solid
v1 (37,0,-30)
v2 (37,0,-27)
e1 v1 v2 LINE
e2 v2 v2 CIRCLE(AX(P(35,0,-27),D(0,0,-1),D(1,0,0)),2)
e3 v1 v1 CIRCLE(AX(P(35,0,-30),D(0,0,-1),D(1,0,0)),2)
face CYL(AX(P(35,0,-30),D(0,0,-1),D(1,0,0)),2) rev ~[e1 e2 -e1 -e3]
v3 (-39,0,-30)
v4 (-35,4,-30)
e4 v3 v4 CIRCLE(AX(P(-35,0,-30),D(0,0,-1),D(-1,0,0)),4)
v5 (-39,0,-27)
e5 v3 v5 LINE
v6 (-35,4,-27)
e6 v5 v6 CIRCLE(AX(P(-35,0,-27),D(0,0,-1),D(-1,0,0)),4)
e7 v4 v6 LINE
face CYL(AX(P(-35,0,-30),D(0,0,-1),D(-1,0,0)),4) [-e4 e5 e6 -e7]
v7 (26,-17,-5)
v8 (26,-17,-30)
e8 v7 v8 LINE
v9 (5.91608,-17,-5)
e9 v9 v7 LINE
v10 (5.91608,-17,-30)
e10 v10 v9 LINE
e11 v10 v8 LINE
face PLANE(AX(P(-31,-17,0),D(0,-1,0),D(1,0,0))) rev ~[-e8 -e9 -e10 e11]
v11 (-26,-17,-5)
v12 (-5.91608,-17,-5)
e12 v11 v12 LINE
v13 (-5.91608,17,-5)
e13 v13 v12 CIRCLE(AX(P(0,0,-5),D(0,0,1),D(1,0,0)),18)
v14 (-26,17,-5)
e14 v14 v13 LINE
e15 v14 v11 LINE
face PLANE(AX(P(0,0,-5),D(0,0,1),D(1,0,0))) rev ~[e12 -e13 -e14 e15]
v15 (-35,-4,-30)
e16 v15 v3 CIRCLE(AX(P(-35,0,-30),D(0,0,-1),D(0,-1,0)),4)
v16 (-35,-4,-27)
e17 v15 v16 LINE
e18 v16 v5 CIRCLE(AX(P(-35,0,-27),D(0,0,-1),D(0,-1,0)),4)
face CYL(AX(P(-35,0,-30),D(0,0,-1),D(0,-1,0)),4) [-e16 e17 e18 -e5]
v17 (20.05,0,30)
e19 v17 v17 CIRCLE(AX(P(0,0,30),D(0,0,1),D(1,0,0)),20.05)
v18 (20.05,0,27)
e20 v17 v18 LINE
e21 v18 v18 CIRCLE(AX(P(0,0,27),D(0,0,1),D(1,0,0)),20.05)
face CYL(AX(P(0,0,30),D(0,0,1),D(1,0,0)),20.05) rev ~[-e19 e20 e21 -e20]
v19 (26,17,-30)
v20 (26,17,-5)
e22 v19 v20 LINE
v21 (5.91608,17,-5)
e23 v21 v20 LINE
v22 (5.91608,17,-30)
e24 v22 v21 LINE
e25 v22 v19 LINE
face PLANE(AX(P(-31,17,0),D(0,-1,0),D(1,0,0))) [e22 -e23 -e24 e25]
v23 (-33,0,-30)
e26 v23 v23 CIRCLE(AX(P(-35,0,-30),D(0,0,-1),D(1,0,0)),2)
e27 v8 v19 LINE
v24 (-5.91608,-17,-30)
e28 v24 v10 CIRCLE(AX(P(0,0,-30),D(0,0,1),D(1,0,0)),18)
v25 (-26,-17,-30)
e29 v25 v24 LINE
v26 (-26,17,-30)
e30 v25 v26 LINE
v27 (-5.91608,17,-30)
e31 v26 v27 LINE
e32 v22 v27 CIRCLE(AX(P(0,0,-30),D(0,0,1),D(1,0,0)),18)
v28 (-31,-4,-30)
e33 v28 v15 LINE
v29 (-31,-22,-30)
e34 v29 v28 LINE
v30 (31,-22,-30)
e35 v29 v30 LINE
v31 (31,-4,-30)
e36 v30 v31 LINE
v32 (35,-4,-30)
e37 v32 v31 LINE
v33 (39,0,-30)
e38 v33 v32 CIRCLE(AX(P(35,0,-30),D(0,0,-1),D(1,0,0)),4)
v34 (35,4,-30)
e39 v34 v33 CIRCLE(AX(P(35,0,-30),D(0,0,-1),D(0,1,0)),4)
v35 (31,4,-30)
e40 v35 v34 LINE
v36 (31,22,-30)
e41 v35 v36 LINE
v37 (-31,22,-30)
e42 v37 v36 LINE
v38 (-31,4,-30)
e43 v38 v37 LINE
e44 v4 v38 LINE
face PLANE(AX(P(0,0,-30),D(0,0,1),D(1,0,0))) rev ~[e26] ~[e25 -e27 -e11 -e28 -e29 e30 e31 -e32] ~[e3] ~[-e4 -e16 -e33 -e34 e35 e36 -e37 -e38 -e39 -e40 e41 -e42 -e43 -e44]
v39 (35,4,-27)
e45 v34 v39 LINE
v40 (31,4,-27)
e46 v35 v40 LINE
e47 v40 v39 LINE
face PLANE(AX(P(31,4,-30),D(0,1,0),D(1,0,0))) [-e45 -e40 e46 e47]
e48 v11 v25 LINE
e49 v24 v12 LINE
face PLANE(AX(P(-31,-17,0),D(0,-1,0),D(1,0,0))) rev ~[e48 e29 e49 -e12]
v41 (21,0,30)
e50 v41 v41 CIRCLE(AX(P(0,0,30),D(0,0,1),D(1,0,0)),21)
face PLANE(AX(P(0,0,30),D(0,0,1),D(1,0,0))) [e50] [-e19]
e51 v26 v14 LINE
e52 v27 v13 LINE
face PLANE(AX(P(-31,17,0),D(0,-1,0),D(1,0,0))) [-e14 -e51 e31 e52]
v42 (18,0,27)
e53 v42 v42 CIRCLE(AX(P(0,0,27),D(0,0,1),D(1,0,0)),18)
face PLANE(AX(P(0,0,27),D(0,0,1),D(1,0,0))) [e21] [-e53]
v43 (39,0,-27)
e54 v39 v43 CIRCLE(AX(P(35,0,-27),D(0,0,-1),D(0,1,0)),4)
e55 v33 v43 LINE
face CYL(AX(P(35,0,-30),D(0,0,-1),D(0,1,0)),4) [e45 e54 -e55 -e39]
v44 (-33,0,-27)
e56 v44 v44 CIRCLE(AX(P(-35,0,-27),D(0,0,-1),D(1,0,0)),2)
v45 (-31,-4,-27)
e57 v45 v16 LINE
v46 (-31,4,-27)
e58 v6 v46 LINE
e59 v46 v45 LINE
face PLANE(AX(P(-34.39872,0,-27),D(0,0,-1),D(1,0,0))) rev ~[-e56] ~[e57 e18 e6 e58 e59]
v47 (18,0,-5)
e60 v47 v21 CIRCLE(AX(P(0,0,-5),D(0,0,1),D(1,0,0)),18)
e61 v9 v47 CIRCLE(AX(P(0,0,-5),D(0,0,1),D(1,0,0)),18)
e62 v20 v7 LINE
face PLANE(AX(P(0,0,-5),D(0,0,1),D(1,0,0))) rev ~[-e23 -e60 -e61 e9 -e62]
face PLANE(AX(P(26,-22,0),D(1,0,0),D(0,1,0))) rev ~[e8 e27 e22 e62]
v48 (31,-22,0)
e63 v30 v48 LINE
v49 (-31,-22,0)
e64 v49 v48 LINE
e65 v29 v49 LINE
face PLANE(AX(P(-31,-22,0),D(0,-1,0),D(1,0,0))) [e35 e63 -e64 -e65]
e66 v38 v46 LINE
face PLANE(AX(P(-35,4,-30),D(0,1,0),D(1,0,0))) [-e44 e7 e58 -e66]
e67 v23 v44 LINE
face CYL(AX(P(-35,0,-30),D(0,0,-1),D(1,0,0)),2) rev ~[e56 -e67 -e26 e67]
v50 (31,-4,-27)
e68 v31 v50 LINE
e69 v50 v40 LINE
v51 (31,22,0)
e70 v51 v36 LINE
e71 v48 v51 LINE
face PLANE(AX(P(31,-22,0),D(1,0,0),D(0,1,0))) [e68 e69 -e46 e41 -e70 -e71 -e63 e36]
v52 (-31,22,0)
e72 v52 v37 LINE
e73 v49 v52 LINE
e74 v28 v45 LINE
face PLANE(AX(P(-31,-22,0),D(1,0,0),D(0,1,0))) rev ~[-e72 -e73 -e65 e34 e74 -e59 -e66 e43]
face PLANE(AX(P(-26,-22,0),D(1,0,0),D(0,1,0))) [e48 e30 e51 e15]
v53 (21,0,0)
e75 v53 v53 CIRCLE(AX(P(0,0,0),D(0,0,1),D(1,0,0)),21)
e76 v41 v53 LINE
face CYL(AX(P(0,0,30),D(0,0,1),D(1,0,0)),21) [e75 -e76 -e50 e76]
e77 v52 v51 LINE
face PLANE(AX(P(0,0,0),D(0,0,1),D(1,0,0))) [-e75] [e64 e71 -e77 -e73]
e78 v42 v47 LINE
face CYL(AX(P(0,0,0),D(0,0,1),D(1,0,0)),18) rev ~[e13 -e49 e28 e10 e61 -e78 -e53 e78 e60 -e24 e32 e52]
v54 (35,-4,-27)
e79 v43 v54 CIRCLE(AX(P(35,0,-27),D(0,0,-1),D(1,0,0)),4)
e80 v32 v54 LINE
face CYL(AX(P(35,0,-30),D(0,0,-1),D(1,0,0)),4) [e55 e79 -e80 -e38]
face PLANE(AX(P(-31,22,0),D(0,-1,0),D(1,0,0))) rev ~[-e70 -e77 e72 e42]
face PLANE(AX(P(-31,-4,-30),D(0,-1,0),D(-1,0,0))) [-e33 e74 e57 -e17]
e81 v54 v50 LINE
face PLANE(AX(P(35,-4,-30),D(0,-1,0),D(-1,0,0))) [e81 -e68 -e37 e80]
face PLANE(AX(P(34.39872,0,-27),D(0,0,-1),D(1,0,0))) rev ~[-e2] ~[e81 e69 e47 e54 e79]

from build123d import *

# Parameters (mm, degrees)
F0_W          = 62
F0_H          = 44
F1_DEPTH      = 30
F1_DEPTH_BACK = 30
F2_W          = 62
F2_H          = 44
F2_R          = 21
F2_R_2        = 18
F3_DEPTH      = 30
F4_T          = 5
F5_R          = 2
F6_DEPTH      = 3
F7_R          = 9.05
F8_DEPTH      = 1.5
F9_R          = 18
F10_DEPTH     = 30.001
F11_R         = 20.05
F12_DEPTH     = 3


# Not quite as in the source:
# - a shell that OpenCascade refuses in one call is made with other operations: the cavity is built on its own and cut out


with BuildPart() as f1:
    # F0 (on Top) → F1 (new body, two sides)
    with BuildSketch(Plane.XY) as f1_sk:
        Rectangle(F0_W, F0_H)
    extrude(amount=F1_DEPTH)
    extrude(f1_sk.sketch, amount=-F1_DEPTH_BACK)

    # F2 (on face) → F3 (cut)
    with BuildSketch(Plane.XY.offset(30)):
        Rectangle(F2_W, F2_H)
        Circle(F2_R, mode=Mode.SUBTRACT)
        Circle(F2_R_2)
    extrude(amount=-F3_DEPTH, mode=Mode.SUBTRACT)

    # F4: shell of thickness 5, made by hand


with BuildPart() as f4_core1:
    # F4_t2: copy of F1
    add(f1.part)

    # the walls: a layer under each face that stays
    f4_faces = [f4_core1.faces().sort_by_distance(p)[0] for p in [
        (0, 22, -15),
        (31, 0, -15),
        (-31, 0, -15),
        (-20.6666666667, -14.6666666667, 0),
        (0, -22, -15),
        (-21, 0, 15),
        (-14, -14, 30),
        (-18, 0, 15),
        (0, 0, 0),
    ]]
    thicken(f4_faces, amount=-F4_T, mode=Mode.SUBTRACT)

    # F4_s3 → F4_t4 (revolve, cut)
    with BuildSketch(Plane.XZ):
        Polygon((21.05, 0.05), (21, -5), (16, -5), (16, 0), align=None)
    revolve(axis=Axis((0, 0, 0), (0, 0, 1)), mode=Mode.SUBTRACT)

    # F4_s5 → F4_t6 (revolve, cut)
    with BuildSketch(Plane.XZ):
        Polygon((17.95, 0.05), (23, 0), (23, -5), (18, -5), align=None)
    revolve(axis=Axis((0, 0, 0), (0, 0, 1)), mode=Mode.SUBTRACT)


with BuildPart() as f1_1:
    add(f1.part)

    # what is left inside the walls is the cavity
    f4_cavity = [f4_core1.part.solids().sort_by_distance(p)[0] for p in [
        (0, -5.666667, -29.95),
    ]]
    add(f4_cavity, mode=Mode.SUBTRACT)

    # F5 (on face) → F6 (join)
    with BuildSketch(Plane(origin=(0, 0, -30), x_dir=(1, 0, 0), z_dir=(0, 0, -1))):
        with BuildLine():
            Line((35, 4), (31, 4))
            Line((31, 4), (31, -4))
            Line((31, -4), (35, -4))
            ThreePointArc((35, -4), (37.8284271247, -2.8284271247), (39, 0))
            ThreePointArc((39, 0), (37.8284271247, 2.8284271247), (35, 4))
        make_face()
        with Locations((35, 0)):
            Circle(F5_R, mode=Mode.SUBTRACT)
        with BuildLine():
            ThreePointArc((-39, 0), (-37.8284271247, -2.8284271247), (-35, -4))
            Line((-35, -4), (-31, -4))
            Line((-31, -4), (-31, 4))
            Line((-31, 4), (-35, 4))
            ThreePointArc((-35, 4), (-37.8284271247, 2.8284271247), (-39, 0))
        make_face()
        with Locations((-35, 0)):
            Circle(F5_R, mode=Mode.SUBTRACT)
    extrude(amount=-F6_DEPTH)

    # F7 (on face) → F8 (cut)
    with BuildSketch(Plane.XY.offset(30)):
        Circle(F7_R)
    extrude(amount=-F8_DEPTH, mode=Mode.SUBTRACT)

    # F9 (on face) → F10 (cut, through all)
    with BuildSketch(Plane.XY):
        Circle(F9_R)
    extrude(amount=-F10_DEPTH, mode=Mode.SUBTRACT)

    # F11 (on face) → F12 (cut)
    with BuildSketch(Plane.XY.offset(30)):
        Circle(F11_R)
    extrude(amount=-F12_DEPTH, mode=Mode.SUBTRACT)


solid = f1_1.part
